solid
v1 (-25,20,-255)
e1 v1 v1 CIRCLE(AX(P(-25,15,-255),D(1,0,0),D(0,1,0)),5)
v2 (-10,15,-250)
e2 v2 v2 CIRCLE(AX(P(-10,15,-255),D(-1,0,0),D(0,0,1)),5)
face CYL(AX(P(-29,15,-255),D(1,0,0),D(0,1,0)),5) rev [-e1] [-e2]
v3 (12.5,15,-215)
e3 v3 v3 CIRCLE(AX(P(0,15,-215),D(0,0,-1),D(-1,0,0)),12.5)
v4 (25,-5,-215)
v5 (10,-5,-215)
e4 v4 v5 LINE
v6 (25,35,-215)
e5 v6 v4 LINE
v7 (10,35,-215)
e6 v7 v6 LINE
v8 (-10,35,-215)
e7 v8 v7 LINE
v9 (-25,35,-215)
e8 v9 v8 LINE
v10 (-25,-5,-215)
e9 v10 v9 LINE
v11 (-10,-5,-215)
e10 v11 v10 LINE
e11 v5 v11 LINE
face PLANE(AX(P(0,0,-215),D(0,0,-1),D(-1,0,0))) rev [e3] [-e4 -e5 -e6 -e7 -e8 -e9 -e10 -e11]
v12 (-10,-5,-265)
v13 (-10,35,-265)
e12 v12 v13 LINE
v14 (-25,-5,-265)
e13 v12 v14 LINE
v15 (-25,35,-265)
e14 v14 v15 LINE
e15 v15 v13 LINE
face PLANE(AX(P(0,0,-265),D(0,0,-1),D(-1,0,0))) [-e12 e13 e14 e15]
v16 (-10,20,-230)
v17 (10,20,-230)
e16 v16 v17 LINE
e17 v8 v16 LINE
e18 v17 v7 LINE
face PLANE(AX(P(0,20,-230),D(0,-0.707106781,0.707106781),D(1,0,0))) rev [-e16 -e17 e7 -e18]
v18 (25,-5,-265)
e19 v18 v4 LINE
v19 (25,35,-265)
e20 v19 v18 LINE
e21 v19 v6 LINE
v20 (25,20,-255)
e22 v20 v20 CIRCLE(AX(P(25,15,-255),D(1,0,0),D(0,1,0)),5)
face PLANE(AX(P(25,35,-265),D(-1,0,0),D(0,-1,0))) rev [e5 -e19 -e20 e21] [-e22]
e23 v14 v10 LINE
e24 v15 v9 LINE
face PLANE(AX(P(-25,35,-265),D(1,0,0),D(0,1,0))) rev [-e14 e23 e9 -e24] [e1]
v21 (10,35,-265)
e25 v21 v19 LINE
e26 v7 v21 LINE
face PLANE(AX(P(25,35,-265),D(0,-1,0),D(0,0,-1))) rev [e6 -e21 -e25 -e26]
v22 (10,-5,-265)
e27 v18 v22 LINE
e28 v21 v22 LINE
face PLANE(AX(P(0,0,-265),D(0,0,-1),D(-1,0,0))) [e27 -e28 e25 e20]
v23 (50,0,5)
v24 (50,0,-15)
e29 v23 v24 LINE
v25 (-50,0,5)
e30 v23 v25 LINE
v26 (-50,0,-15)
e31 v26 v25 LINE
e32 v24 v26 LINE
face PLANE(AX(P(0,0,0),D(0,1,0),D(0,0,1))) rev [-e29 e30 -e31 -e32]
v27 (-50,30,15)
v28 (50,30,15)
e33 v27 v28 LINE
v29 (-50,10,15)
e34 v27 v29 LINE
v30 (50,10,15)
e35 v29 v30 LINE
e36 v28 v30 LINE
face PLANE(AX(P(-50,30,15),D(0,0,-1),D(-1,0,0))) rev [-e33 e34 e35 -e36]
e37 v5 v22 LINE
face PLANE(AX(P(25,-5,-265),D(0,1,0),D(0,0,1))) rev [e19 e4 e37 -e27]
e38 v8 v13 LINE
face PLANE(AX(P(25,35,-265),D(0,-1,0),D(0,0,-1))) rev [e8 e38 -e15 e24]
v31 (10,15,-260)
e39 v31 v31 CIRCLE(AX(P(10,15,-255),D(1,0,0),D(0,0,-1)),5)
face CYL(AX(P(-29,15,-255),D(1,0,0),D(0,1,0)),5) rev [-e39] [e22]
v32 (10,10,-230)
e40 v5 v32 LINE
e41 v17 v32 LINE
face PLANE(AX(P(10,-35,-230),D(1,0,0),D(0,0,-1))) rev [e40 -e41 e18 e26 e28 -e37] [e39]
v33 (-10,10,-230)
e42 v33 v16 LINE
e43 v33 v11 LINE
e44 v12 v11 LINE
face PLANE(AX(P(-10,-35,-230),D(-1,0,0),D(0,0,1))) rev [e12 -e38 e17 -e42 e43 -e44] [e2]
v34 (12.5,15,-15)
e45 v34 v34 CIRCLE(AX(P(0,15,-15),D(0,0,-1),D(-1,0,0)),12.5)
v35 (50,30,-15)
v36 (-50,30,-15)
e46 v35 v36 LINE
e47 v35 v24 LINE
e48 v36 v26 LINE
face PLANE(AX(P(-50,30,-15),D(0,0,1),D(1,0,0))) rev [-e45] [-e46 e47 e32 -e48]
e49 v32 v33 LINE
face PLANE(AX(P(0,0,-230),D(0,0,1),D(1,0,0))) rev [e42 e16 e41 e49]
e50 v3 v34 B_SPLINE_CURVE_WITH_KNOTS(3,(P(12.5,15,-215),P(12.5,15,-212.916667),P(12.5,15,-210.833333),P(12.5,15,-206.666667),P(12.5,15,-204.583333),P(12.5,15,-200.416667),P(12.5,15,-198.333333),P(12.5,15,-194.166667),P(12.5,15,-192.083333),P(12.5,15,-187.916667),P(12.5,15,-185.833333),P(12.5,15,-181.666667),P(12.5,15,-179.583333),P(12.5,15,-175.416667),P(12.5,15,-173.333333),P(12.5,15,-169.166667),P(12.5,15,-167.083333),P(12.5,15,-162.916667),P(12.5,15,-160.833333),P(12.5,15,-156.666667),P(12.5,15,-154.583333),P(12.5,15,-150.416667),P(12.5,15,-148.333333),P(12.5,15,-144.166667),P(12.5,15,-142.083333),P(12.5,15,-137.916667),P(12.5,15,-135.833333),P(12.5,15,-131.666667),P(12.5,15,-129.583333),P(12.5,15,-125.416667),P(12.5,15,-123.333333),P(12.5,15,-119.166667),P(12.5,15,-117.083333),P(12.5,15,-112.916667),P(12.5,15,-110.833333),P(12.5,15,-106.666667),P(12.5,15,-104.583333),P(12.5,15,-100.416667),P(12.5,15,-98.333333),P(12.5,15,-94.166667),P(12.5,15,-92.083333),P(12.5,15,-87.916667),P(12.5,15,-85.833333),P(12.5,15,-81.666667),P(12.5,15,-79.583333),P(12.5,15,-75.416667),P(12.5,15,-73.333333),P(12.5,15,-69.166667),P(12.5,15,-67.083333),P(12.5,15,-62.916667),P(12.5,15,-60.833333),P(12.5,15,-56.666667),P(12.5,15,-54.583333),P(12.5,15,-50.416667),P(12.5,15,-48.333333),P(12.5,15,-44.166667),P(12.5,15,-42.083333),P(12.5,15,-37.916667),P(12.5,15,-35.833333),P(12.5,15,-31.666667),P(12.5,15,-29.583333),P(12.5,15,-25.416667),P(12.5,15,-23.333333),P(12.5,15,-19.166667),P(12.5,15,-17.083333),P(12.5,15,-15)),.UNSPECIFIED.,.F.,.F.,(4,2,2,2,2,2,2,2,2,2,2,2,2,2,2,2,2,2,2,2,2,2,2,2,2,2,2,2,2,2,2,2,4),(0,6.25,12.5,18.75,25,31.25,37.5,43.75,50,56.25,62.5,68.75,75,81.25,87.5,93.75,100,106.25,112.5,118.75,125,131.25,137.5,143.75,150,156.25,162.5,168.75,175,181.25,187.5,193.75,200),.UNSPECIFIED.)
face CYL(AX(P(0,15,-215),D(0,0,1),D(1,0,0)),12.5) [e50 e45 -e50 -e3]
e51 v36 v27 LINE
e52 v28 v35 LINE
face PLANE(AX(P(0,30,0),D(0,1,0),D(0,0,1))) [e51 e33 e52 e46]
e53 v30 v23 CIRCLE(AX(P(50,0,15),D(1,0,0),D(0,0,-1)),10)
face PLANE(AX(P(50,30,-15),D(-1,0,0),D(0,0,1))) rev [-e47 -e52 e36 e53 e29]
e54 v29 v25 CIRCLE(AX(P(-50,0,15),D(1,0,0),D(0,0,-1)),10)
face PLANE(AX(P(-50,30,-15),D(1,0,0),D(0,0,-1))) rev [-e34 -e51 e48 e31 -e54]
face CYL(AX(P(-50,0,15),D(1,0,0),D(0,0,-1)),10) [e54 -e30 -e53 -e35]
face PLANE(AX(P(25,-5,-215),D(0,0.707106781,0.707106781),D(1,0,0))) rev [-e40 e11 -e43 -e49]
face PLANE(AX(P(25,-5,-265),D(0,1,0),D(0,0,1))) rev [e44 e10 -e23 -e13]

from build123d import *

# Parameters (mm, degrees)
SKIZZE1_W                       = 100
SKIZZE1_H                       = 30
AUFSATZ_LINEAR_AUSTRAGEN1_DEPTH = 30
SKIZZE2_R                       = 10
AUFSATZ_LINEAR_AUSTRAGEN2_DEPTH = 100
SKIZZE3_R                       = 12.5
AUFSATZ_LINEAR_AUSTRAGEN3_DEPTH = 200
SKIZZE4_W                       = 50
SKIZZE4_H                       = 40
AUFSATZ_LINEAR_AUSTRAGEN4_DEPTH = 50
SKIZZE6_W                       = 20
SKIZZE6_H                       = 70
SCHNITT_LINEAR_AUSTRAGEN2_DEPTH = 35
FASE1_SIZE                      = 15
SKIZZE7_R                       = 5
SCHNITT_LINEAR_AUSTRAGEN3_DEPTH = 54


with BuildPart() as part:
    # Skizze1 → Aufsatz-Linear austragen1 (new body)
    with BuildSketch(Plane(origin=(0, 0, 0), x_dir=(1, 0, 0), z_dir=(0, 1, 0))):
        Rectangle(SKIZZE1_W, SKIZZE1_H)
    extrude(amount=AUFSATZ_LINEAR_AUSTRAGEN1_DEPTH)

    # Skizze2 → Aufsatz-Linear austragen2 (add)
    with BuildSketch(Plane(origin=(50, 0, 0), x_dir=(0, 0, -1), z_dir=(1, 0, 0))):
        with Locations((-15, 0)):
            Circle(SKIZZE2_R)
    extrude(amount=-AUFSATZ_LINEAR_AUSTRAGEN2_DEPTH)

    # Skizze3 → Aufsatz-Linear austragen3 (add)
    with BuildSketch(Plane(origin=(0, 0, -15), x_dir=(-1, 0, 0), z_dir=(0, 0, -1))):
        with Locations(Location((0, 15, 0), (0, 0, 180))):
            Circle(SKIZZE3_R)
    extrude(amount=AUFSATZ_LINEAR_AUSTRAGEN3_DEPTH)

    # Skizze4 → Aufsatz-Linear austragen4 (add)
    with BuildSketch(Plane(origin=(0, 0, -215), x_dir=(-1, 0, 0), z_dir=(0, 0, -1))):
        with Locations((0, 15)):
            Rectangle(SKIZZE4_W, SKIZZE4_H)
    extrude(amount=AUFSATZ_LINEAR_AUSTRAGEN4_DEPTH)

    # Skizze6 → Schnitt-Linear austragen2 (cut)
    with BuildSketch(Plane(origin=(0, 0, -265), x_dir=(-1, 0, 0), z_dir=(0, 0, -1))):
        Rectangle(SKIZZE6_W, SKIZZE6_H)
    extrude(amount=-SCHNITT_LINEAR_AUSTRAGEN2_DEPTH, mode=Mode.SUBTRACT)

    # Fase1
    fase1_edges = [part.edges().sort_by_distance(p)[0] for p in [
        (0, -5, -230),
        (0, 35, -230),
    ]]
    chamfer(fase1_edges, length=FASE1_SIZE - 0.0001)  # a hair under: the kernel refuses the full size

    # Skizze7 → Schnitt-Linear austragen3 (cut)
    with BuildSketch(Plane(origin=(25, 0, 0), x_dir=(0, 0, -1), z_dir=(1, 0, 0))):
        with Locations(Location((255, 15, 0), (0, 0, 90))):
            Circle(SKIZZE7_R)
    extrude(amount=-SCHNITT_LINEAR_AUSTRAGEN3_DEPTH, mode=Mode.SUBTRACT)


solid = part.part
